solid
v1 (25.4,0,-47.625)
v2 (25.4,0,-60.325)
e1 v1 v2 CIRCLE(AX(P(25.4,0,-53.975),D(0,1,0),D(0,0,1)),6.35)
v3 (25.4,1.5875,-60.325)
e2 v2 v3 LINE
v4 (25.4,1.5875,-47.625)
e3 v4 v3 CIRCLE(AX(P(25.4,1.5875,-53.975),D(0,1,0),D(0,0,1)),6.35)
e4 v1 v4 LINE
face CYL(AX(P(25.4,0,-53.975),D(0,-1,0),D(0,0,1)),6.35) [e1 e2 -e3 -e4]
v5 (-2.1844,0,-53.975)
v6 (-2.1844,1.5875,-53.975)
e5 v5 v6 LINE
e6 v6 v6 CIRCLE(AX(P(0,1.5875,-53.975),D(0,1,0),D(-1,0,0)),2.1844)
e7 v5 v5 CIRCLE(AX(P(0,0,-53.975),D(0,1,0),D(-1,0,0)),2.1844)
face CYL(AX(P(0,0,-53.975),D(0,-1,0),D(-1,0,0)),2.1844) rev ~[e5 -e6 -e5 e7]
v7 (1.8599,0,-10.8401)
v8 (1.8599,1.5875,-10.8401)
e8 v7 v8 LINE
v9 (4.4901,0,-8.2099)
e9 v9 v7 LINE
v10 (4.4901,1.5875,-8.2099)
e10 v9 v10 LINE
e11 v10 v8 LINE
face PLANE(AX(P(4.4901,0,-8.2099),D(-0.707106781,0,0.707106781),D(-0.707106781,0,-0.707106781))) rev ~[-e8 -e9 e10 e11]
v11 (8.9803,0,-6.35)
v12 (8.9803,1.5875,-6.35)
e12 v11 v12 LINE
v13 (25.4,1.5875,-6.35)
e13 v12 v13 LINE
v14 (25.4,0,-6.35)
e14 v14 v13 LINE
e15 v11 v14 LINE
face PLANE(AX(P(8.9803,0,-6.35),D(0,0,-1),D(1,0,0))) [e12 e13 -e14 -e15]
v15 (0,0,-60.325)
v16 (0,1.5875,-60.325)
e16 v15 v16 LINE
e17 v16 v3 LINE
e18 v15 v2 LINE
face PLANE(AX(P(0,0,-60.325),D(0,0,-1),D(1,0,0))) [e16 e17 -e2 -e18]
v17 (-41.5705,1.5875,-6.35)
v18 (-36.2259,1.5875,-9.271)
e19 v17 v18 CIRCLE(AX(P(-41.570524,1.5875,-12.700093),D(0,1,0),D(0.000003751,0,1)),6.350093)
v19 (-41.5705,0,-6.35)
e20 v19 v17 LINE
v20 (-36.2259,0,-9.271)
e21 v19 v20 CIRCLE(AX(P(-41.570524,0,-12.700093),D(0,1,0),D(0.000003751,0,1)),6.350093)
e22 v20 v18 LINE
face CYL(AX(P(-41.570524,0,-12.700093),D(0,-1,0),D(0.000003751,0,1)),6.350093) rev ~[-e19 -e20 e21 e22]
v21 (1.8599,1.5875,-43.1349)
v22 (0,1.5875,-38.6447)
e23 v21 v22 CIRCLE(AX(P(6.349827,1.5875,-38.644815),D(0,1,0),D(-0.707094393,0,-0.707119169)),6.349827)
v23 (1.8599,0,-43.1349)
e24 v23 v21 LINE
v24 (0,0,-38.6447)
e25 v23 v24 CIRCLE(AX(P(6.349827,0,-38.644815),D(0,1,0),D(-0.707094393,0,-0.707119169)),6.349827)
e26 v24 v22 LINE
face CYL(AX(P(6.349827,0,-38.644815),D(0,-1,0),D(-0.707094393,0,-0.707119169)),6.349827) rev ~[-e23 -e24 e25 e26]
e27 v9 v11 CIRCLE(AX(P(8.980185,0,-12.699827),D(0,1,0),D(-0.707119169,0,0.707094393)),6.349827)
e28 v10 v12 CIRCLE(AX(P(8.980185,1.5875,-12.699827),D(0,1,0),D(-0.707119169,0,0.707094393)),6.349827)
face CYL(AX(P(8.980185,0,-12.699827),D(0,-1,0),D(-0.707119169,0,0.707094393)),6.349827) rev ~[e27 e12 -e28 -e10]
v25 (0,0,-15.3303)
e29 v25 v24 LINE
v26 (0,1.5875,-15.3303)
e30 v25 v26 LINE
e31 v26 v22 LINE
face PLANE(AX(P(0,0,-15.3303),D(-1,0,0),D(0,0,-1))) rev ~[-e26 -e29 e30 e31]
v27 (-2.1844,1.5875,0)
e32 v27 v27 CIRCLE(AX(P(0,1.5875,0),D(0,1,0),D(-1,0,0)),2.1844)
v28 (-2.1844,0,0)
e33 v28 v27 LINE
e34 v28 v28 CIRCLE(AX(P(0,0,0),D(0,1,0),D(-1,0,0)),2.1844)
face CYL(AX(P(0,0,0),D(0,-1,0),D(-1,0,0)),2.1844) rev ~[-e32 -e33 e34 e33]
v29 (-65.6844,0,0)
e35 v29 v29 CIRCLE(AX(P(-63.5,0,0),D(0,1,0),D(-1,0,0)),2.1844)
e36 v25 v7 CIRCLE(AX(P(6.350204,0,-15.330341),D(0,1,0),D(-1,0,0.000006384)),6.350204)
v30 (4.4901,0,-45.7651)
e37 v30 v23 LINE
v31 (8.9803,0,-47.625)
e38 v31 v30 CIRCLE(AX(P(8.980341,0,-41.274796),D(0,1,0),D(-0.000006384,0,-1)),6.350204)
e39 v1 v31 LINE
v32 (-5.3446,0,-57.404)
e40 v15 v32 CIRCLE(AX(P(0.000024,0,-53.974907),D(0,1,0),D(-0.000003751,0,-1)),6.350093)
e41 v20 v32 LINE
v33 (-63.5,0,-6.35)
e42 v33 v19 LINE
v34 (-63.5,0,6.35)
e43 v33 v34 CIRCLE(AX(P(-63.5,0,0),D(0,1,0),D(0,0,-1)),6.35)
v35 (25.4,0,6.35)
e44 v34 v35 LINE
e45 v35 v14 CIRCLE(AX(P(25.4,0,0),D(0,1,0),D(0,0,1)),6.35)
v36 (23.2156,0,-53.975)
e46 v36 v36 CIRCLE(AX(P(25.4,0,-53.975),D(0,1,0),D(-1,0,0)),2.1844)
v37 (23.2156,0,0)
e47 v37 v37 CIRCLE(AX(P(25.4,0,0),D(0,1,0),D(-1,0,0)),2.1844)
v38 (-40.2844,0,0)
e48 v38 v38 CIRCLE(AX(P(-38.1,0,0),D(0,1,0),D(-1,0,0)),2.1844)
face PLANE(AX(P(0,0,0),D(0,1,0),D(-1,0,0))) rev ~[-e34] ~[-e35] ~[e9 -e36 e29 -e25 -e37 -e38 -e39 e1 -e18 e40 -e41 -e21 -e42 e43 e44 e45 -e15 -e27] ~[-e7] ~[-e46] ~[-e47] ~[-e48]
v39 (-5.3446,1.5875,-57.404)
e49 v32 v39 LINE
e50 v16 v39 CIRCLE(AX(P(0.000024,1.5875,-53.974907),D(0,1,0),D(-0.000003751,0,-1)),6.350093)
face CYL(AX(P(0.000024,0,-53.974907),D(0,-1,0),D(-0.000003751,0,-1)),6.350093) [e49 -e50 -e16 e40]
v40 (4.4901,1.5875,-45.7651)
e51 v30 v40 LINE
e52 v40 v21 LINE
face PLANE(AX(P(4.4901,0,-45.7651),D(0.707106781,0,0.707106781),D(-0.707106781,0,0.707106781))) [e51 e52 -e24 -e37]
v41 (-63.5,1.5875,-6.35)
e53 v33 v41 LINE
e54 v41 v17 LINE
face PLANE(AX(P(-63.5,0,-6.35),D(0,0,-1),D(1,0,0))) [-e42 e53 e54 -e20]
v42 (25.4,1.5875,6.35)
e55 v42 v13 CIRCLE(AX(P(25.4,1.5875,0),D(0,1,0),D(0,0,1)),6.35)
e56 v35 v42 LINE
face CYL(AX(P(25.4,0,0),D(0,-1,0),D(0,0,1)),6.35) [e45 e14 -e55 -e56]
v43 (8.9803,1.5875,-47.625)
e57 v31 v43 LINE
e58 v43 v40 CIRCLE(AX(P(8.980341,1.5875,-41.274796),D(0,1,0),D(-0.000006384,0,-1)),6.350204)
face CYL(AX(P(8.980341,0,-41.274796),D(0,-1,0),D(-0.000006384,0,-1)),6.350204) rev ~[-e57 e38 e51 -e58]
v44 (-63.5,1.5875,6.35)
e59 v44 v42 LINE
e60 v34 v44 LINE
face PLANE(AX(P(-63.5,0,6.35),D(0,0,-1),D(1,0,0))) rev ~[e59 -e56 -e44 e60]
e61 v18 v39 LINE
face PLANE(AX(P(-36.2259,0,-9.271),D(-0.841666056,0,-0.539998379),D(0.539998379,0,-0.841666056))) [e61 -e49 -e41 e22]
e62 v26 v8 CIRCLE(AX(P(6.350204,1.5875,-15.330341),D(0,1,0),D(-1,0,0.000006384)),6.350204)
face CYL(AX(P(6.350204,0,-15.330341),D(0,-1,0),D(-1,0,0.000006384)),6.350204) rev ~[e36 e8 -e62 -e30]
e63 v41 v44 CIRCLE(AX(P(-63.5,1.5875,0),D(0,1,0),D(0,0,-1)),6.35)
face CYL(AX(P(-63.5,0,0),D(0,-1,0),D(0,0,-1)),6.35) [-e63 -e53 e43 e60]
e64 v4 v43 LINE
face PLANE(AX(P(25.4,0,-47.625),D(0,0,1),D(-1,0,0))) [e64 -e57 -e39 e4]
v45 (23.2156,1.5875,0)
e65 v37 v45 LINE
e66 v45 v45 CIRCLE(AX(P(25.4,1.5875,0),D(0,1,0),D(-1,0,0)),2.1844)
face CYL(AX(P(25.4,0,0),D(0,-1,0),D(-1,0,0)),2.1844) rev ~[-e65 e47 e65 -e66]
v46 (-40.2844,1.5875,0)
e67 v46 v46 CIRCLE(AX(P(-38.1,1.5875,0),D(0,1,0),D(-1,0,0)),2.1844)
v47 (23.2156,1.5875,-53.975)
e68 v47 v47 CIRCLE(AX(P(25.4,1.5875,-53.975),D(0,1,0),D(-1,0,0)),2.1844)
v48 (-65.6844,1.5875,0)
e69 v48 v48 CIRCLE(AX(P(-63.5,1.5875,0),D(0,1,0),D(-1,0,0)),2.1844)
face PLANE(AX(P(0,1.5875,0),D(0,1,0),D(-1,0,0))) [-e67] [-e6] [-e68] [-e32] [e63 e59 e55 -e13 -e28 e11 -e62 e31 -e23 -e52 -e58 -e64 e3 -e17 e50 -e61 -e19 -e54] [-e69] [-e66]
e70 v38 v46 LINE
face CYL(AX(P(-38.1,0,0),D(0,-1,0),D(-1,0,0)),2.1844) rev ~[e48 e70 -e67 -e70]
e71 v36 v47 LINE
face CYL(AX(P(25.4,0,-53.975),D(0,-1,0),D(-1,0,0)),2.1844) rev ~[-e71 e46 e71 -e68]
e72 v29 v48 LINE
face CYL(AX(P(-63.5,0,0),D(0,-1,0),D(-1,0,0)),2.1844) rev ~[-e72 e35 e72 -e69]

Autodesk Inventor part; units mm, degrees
ref_plane "YZ Plane" through (0, 0, 0) normal (1, 0, 0) x (0, 1, 0)
ref_plane "XZ Plane" through (0, 0, 0) normal (0, 1, 0) x (-1, 0, 0)
ref_plane "XY Plane" through (0, 0, 0) normal (0, 0, 1) x (1, 0, 0)
sketch "main" plane through (0, 0, 0) normal (0, 0, 1) x (1, 0, 0)
  circle A0 centre (-18.4512, -23.1863) radius 2.1844
  line L0 (-22.9413, -14.9764) -> (-20.311, -12.3462)
  line L1 (-43.8512, -16.8363) -> (-27.4314, -16.8363)
  arc A1 (-27.4314, -16.8363) -> (-22.9413, -14.9764) centre (-27.4314, -10.4863) ccw
  circle A2 centre (-43.8512, -23.1863) radius 2.1844
  arc A3 (-43.8512, -16.8363) -> (-43.8512, -29.5363) centre (-43.8512, -23.1863) ccw
  arc A4 (-20.311, -12.3462) -> (-18.4512, -7.856) centre (-24.8012, -7.856) ccw
  line L2 (-18.4512, 15.4585) -> (-18.4512, -7.856)
  line L3 (17.7748, 21.5177) -> (-13.1066, -26.6153)
  arc A5 (-18.4512, 15.4585) -> (-20.311, 19.9486) centre (-24.8012, 15.4585) ccw
  line L4 (-22.9413, 22.5788) -> (-20.311, 19.9486)
  arc A6 (-22.9413, 22.5788) -> (-27.4314, 24.4387) centre (-27.4314, 18.0887) ccw
  circle A7 centre (-43.8512, 30.7887) radius 2.1844
  circle A8 centre (-18.4512, 30.7887) radius 2.1844
  circle A9 centre (19.6488, 30.7887) radius 2.1844
  line L5 (45.0488, 37.1387) -> (-43.8512, 37.1387)
  line L6 (-27.4314, 24.4387) -> (-43.8512, 24.4387)
  arc A10 (-43.8512, 37.1387) -> (-43.8512, 24.4387) centre (-43.8512, 30.7887) ccw
  arc A11 (23.1193, 24.4387) -> (17.7748, 21.5177) centre (23.1193, 18.0887) ccw
  line L7 (45.0488, 24.4387) -> (23.1193, 24.4387)
  circle A12 centre (45.0488, 30.7887) radius 2.1844
  arc A13 (45.0488, 24.4387) -> (45.0488, 37.1387) centre (45.0488, 30.7887) ccw
  line L8 (-18.4512, -29.5363) -> (-43.8512, -29.5363)
  arc A14 (-18.4512, -29.5363) -> (-13.1066, -26.6153) centre (-18.4512, -23.1863) ccw
  point P0 (-14.0637, 6.8091)
  dimension "d0" = 6.35
  dimension "d1" = 6.35
sketch "Sketch1" plane through (0, 0, 0) normal (0, 1, 0) x (-1, 0, 0)
  circle A0 centre (0, -53.975) radius 2.1844
  line L0 (-4.4901, -45.7651) -> (-1.8599, -43.1349)
  line L1 (-25.4, -47.625) -> (-8.9803, -47.625)
  arc A1 (-8.9803, -47.625) -> (-4.4901, -45.7651) centre (-8.9803, -41.275) ccw
  circle A2 centre (-25.4, -53.975) radius 2.1844
  arc A3 (-25.4, -47.625) -> (-25.4, -60.325) centre (-25.4, -53.975) ccw
  arc A4 (-1.8599, -43.1349) -> (0, -38.6447) centre (-6.35, -38.6447) ccw
  line L2 (0, -15.3303) -> (0, -38.6447)
  line L3 (36.2259, -9.271) -> (5.3446, -57.404)
  arc A5 (0, -15.3303) -> (-1.8599, -10.8401) centre (-6.35, -15.3303) ccw
  line L4 (-4.4901, -8.2099) -> (-1.8599, -10.8401)
  arc A6 (-4.4901, -8.2099) -> (-8.9803, -6.35) centre (-8.9803, -12.7) ccw
  circle A7 centre (-25.4, 0) radius 2.1844
  circle A8 centre (0, 0) radius 2.1844
  circle A9 centre (38.1, 0) radius 2.1844
  line L5 (63.5, 6.35) -> (-25.4, 6.35)
  line L6 (-8.9803, -6.35) -> (-25.4, -6.35)
  arc A10 (-25.4, 6.35) -> (-25.4, -6.35) centre (-25.4, 0) ccw
  arc A11 (41.5705, -6.35) -> (36.2259, -9.271) centre (41.5705, -12.7) ccw
  line L7 (63.5, -6.35) -> (41.5705, -6.35)
  circle A12 centre (63.5, 0) radius 2.1844
  arc A13 (63.5, -6.35) -> (63.5, 6.35) centre (63.5, 0) ccw
  line L8 (0, -60.325) -> (-25.4, -60.325)
  arc A14 (0, -60.325) -> (5.3446, -57.404) centre (0, -53.975) ccw
extrude "Extrusion1" add sketch "Sketch1" along normal blind 1.5875
properties part number "gusset" material "Acetal Resin, White"
